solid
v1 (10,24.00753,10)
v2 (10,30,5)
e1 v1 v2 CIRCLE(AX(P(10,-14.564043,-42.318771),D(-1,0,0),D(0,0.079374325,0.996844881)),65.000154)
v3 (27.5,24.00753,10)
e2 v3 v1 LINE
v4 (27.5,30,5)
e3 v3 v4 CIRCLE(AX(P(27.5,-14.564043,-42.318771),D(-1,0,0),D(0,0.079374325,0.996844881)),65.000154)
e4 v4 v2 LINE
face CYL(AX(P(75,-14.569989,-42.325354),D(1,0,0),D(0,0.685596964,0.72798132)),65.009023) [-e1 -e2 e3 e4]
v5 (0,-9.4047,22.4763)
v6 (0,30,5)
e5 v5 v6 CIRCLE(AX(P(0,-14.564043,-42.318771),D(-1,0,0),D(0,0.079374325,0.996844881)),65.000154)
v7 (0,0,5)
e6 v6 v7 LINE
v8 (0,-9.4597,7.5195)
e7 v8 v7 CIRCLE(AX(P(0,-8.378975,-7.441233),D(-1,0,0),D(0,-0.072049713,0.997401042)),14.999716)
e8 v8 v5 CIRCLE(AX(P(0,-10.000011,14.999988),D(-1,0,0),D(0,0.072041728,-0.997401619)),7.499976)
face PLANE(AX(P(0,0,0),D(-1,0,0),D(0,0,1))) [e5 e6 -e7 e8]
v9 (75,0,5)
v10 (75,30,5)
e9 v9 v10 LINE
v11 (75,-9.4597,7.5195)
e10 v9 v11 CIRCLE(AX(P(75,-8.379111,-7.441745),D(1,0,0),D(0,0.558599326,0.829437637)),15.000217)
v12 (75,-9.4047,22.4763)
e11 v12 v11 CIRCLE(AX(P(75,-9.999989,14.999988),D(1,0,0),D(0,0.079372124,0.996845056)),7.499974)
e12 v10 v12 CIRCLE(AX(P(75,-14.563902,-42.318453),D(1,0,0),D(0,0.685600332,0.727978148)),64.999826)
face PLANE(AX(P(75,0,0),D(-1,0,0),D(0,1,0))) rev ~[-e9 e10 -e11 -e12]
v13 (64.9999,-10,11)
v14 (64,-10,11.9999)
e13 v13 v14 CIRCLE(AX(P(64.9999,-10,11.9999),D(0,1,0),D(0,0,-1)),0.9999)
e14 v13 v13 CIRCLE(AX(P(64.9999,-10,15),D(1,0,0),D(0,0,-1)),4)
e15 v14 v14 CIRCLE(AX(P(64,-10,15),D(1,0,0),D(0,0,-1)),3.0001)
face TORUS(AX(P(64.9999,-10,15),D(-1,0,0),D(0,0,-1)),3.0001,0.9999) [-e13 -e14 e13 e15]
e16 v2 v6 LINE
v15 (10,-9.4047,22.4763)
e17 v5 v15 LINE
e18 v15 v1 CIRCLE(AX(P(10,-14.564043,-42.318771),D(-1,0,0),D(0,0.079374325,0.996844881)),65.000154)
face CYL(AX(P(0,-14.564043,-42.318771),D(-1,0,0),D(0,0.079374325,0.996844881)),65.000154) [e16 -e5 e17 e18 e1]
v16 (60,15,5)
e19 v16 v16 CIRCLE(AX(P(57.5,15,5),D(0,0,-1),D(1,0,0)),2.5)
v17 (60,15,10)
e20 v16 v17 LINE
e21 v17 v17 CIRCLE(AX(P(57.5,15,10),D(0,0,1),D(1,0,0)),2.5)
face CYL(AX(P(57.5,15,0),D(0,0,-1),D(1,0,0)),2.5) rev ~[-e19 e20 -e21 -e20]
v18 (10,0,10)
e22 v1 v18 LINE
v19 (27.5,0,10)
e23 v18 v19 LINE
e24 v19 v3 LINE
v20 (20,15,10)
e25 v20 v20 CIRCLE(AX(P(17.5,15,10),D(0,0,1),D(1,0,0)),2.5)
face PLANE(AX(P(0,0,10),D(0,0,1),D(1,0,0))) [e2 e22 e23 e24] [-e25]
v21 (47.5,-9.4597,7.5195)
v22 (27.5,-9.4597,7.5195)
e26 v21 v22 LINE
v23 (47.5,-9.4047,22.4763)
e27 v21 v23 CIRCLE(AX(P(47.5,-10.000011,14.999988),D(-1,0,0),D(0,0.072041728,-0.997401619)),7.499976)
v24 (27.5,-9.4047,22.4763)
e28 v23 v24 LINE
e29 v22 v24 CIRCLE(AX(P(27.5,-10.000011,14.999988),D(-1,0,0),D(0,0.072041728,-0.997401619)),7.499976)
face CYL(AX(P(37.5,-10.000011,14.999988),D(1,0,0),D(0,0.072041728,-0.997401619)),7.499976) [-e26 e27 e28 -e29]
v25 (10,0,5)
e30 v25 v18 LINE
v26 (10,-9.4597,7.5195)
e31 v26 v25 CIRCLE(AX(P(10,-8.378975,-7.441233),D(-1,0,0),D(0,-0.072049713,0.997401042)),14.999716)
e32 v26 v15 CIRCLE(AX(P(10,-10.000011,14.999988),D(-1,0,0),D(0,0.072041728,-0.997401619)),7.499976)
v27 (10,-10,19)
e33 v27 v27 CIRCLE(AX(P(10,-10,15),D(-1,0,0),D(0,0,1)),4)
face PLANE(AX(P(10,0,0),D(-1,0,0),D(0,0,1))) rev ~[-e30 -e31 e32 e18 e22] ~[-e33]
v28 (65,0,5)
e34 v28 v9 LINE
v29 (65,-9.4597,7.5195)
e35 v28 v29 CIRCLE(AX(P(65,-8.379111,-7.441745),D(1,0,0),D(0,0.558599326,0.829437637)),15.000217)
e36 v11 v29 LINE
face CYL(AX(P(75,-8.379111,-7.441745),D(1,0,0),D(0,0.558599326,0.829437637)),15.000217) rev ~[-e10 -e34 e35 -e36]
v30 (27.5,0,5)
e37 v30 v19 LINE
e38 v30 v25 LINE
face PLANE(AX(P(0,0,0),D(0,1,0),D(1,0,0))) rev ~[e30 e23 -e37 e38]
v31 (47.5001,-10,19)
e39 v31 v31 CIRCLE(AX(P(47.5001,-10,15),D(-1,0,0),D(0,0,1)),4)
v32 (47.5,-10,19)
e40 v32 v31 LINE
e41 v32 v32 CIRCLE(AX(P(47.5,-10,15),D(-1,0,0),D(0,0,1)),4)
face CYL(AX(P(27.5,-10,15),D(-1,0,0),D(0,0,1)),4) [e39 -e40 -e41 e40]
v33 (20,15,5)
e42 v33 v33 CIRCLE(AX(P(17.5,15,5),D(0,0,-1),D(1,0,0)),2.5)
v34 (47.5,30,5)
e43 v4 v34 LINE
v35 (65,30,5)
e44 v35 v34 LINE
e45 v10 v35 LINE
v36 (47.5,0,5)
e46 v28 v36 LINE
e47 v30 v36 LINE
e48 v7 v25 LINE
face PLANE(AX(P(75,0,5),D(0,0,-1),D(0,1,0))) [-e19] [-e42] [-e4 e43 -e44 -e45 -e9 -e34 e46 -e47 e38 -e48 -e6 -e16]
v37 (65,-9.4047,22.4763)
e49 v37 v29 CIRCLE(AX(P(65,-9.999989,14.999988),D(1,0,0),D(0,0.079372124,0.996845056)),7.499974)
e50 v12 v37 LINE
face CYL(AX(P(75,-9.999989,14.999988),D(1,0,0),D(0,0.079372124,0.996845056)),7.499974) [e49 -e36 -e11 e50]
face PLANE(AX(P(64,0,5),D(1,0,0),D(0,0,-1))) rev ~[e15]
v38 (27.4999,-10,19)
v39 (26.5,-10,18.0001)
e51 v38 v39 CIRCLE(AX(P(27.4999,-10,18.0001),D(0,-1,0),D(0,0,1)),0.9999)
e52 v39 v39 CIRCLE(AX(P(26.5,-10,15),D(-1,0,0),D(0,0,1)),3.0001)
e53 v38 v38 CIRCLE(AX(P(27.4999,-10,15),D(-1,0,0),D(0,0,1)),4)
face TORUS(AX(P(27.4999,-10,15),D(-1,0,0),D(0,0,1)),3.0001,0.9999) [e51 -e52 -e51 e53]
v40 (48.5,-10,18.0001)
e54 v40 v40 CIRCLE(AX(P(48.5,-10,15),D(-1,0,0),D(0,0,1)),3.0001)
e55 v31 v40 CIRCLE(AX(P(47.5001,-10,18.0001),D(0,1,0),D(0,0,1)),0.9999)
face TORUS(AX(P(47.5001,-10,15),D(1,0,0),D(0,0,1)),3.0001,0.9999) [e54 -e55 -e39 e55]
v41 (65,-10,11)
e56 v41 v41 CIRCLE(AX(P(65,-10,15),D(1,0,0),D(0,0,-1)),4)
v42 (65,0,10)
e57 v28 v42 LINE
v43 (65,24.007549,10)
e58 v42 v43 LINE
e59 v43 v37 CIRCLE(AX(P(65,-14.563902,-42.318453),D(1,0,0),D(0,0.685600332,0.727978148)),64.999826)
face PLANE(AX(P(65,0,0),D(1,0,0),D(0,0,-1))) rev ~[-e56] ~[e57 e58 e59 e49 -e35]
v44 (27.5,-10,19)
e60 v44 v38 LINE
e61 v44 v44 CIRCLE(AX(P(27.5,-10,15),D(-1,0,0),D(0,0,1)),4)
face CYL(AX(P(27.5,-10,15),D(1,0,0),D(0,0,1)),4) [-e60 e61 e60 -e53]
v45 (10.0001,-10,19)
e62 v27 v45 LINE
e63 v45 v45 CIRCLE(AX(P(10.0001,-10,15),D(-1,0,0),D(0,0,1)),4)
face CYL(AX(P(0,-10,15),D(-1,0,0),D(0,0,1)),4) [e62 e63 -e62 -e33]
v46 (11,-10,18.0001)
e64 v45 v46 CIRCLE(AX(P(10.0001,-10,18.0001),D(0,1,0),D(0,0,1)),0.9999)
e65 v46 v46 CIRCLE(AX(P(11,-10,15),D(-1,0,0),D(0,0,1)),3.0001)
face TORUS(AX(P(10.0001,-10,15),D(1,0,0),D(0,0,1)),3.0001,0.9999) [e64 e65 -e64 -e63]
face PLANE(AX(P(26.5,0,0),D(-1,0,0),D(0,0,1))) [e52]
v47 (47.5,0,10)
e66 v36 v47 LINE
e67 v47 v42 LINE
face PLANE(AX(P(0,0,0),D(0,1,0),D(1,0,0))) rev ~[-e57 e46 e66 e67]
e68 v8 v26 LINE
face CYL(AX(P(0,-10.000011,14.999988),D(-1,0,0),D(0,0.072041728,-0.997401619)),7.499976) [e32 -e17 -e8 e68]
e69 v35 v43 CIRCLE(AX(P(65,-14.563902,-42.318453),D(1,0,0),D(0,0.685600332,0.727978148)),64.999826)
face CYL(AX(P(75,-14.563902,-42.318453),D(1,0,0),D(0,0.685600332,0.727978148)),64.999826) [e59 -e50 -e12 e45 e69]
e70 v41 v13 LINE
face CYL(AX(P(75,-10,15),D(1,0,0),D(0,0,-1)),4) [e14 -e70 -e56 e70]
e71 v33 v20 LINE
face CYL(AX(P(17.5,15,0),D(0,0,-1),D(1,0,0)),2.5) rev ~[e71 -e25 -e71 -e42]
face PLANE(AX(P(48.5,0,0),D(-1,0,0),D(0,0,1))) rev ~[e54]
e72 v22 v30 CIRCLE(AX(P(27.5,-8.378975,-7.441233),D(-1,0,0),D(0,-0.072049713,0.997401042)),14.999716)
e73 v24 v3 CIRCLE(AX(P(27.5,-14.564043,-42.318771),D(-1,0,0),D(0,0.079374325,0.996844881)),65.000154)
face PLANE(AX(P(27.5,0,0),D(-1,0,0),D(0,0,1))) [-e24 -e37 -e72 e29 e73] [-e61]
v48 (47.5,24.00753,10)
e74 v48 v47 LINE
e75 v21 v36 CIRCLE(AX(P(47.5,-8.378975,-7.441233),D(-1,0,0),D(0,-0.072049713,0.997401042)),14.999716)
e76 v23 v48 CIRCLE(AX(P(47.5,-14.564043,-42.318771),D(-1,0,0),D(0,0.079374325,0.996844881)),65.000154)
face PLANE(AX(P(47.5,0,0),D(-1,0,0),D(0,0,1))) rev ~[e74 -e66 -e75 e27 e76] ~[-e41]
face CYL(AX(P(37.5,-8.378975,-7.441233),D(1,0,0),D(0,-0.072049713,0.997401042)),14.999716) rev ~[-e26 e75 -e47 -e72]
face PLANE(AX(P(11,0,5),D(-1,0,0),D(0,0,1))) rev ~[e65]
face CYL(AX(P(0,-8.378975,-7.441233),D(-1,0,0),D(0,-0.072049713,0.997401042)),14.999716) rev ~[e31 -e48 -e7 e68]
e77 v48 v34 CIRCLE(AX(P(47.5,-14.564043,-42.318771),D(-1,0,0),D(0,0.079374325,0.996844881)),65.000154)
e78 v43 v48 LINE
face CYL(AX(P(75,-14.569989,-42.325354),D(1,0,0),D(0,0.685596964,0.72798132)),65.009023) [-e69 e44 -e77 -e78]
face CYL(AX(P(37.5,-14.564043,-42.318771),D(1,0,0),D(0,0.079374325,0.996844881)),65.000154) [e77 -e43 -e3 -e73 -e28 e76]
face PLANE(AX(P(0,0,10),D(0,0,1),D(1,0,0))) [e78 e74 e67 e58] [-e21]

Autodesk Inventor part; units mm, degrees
ref_plane "YZ Plane" through (0, 0, 0) normal (1, 0, 0) x (0, 1, 0)
ref_plane "XZ Plane" through (0, 0, 0) normal (0, 1, 0) x (-1, 0, 0)
sketch "Sketch1" plane through (0, 0, 0) normal (0, 0, 1) x (1, 0, 0)
  line L0 (0, 0) -> (75, 0)
  line L1 (75, 0) -> (75, 30)
  line L2 (75, 30) -> (0, 30)
  line L3 (0, 30) -> (0, 0)
  circle A0 centre (17.5, 15) radius 2.5
  circle A1 centre (57.5, 15) radius 2.5
  line L4 (17.5, 15) -> (57.5, 15) construction
  point P0 (37.5, 15)
  point P1 (37.5, 30)
  dimension "d0" = 75
  dimension "d1" = 30
  dimension "d2" = 5
  dimension "d3" = 5
  dimension "d4" = 40
  dimension "d5" = 15
extrude "Extrusion1" add sketch "Sketch1" along normal blind 5
sketch "Sketch2" plane through (75, 0, 0) normal (1, 0, 0) x (0, 0, -1)
  circle A0 centre (-15, -10) radius 4
  circle A1 centre (-15, -10) radius 7.5 construction
  line L0 (-5, 0) -> (-5, 30) construction
  arc A2 (-5, 30) -> (-22.4763, -9.4047) centre (42.3186, -14.564) ccw
  arc A3 (-5, 0) -> (-7.5195, -9.4597) centre (7.4415, -8.379) ccw
  arc A4 (-22.4763, -9.4047) -> (-7.5195, -9.4597) centre (-15, -10) ccw
  line L1 (0, 0) -> (-5, 0) projected
  line L2 (0, 30) -> (-5, 30) projected
  line L3 (-5, 30) -> (-5, 0)
  dimension "d8" = 8
  dimension "d9" = 15
  dimension "d10" = 10
  dimension "d11" = 10
  dimension "d12" = 65
  dimension "d13" = 15
extrude "Extrusion2" add sketch "Sketch2" against normal blind 10
sketch "Sketch3" plane through (0, 0, 0) normal (-1, 0, 0) x (0, 0, 1)
  circle A0 centre (15, -10) radius 4 projected
  arc A1 (7.5195, -9.4597) -> (5, 0) centre (-7.4415, -8.379) ccw projected
  arc A2 (7.5195, -9.4597) -> (22.4763, -9.4047) centre (15, -10) ccw projected
  arc A3 (22.4763, -9.4047) -> (5, 30) centre (-42.3186, -14.564) ccw projected
  line L0 (5, 0) -> (5, 30) projected
  point P0 (0, 0)
extrude "Extrusion3" add sketch "Sketch3" against normal blind 10
ref_plane "Work Plane1" through (37.5, 0, 0) normal (-1, 0, 0) x (0, 0, 1)
sketch "Sketch4" plane through (37.5, 0, 0) normal (-1, 0, 0) x (0, 0, 1)
  circle A0 centre (15, -10) radius 4 projected
  arc A1 (7.5195, -9.4597) -> (5, 0) centre (-7.4415, -8.379) ccw projected
  arc A2 (7.5195, -9.4597) -> (22.4763, -9.4047) centre (15, -10) ccw projected
  arc A3 (22.4763, -9.4047) -> (5, 30) centre (-42.3186, -14.564) ccw projected
  line L0 (5, 0) -> (5, 30) projected
  point P0 (0, 0)
extrude "Extrusion4" add sketch "Sketch4" along normal mid plane 20
sketch "Sketch5" plane through (0, 0, 5) normal (0, 0, 1) x (1, 0, 0)
  circle A0 centre (17.5, 15) radius 2.5 projected
  line L0 (27.5, 0) -> (27.5, 30) projected
  line L1 (27.5, 30) -> (10, 30) projected
  line L2 (10, 30) -> (10, 0) projected
  line L3 (10, 0) -> (27.5, 0) projected
  line L4 (47.5, 30) -> (47.5, 0) projected
  line L5 (47.5, 0) -> (65, 0) projected
  line L6 (65, 0) -> (65, 30) projected
  line L7 (65, 30) -> (47.5, 30) projected
  circle A1 centre (57.5, 15) radius 2.5 projected
  point P0 (0, 0)
extrude "Extrusion5" add sketch "Sketch5" along normal blind 5
sketch "Sketch6" plane through (75, 0, 0) normal (1, 0, 0) x (0, 0, -1)
  line L0 (0, 0) -> (-5, 0) projected
  line L1 (0, 30) -> (-5, 30) projected
  line L2 (0, 0) -> (-5, 0)
  line L3 (-5, 0) -> (-5, 30)
  line L4 (-5, 30) -> (0, 30)
  line L5 (0, 30) -> (0, 0)
  arc A0 (-5, 30) -> (-10, 24.0076) centre (42.3186, -14.564) ccw projected
  line L6 (-5, 30) -> (-10, 30) projected
  line L7 (-10, 24.0076) -> (-10, 30) projected
extrude "Extrusion6" cut sketch "Sketch6" against normal through all
sketch "Sketch7" plane through (0, 0, 5) normal (-1, 0, 0) x (0, 0, 1)
  circle A0 centre (10, -10) radius 4 projected
  point P0 (-5, 0)
extrude "Extrusion7" add sketch "Sketch7" against normal blind 11
sketch "Sketch8" plane through (27.5, 0, 0) normal (-1, 0, 0) x (0, 0, 1)
  line L0 (10, 24.0076) -> (10, 0) projected
  line L1 (10, 0) -> (5, 0) projected
  arc A0 (7.5195, -9.4597) -> (5, 0) centre (-7.4415, -8.379) ccw projected
  arc A1 (7.5195, -9.4597) -> (22.4763, -9.4047) centre (15, -10) ccw projected
  arc A2 (22.4763, -9.4047) -> (10, 24.0076) centre (-42.3186, -14.564) ccw projected
  circle A3 centre (15, -10) radius 4 projected
  point P0 (0, 0)
extrude "Extrusion8" add sketch "Sketch8" along normal blind 1 and the other way blind 21 contours A3
sketch "Sketch9" plane through (75, 0, 5) normal (1, 0, 0) x (0, 0, -1)
  circle A0 centre (-10, -10) radius 4 projected
  point P0 (5, 0)
extrude "Extrusion9" add sketch "Sketch9" against normal blind 11
fillet "Fillet1" radius 1 4 edges at (11, -10, 11) (26.5, -10, 11) (48.5, -10, 11) (64, -10, 19)
properties part number "TC006b" material "ABS Plastic"
